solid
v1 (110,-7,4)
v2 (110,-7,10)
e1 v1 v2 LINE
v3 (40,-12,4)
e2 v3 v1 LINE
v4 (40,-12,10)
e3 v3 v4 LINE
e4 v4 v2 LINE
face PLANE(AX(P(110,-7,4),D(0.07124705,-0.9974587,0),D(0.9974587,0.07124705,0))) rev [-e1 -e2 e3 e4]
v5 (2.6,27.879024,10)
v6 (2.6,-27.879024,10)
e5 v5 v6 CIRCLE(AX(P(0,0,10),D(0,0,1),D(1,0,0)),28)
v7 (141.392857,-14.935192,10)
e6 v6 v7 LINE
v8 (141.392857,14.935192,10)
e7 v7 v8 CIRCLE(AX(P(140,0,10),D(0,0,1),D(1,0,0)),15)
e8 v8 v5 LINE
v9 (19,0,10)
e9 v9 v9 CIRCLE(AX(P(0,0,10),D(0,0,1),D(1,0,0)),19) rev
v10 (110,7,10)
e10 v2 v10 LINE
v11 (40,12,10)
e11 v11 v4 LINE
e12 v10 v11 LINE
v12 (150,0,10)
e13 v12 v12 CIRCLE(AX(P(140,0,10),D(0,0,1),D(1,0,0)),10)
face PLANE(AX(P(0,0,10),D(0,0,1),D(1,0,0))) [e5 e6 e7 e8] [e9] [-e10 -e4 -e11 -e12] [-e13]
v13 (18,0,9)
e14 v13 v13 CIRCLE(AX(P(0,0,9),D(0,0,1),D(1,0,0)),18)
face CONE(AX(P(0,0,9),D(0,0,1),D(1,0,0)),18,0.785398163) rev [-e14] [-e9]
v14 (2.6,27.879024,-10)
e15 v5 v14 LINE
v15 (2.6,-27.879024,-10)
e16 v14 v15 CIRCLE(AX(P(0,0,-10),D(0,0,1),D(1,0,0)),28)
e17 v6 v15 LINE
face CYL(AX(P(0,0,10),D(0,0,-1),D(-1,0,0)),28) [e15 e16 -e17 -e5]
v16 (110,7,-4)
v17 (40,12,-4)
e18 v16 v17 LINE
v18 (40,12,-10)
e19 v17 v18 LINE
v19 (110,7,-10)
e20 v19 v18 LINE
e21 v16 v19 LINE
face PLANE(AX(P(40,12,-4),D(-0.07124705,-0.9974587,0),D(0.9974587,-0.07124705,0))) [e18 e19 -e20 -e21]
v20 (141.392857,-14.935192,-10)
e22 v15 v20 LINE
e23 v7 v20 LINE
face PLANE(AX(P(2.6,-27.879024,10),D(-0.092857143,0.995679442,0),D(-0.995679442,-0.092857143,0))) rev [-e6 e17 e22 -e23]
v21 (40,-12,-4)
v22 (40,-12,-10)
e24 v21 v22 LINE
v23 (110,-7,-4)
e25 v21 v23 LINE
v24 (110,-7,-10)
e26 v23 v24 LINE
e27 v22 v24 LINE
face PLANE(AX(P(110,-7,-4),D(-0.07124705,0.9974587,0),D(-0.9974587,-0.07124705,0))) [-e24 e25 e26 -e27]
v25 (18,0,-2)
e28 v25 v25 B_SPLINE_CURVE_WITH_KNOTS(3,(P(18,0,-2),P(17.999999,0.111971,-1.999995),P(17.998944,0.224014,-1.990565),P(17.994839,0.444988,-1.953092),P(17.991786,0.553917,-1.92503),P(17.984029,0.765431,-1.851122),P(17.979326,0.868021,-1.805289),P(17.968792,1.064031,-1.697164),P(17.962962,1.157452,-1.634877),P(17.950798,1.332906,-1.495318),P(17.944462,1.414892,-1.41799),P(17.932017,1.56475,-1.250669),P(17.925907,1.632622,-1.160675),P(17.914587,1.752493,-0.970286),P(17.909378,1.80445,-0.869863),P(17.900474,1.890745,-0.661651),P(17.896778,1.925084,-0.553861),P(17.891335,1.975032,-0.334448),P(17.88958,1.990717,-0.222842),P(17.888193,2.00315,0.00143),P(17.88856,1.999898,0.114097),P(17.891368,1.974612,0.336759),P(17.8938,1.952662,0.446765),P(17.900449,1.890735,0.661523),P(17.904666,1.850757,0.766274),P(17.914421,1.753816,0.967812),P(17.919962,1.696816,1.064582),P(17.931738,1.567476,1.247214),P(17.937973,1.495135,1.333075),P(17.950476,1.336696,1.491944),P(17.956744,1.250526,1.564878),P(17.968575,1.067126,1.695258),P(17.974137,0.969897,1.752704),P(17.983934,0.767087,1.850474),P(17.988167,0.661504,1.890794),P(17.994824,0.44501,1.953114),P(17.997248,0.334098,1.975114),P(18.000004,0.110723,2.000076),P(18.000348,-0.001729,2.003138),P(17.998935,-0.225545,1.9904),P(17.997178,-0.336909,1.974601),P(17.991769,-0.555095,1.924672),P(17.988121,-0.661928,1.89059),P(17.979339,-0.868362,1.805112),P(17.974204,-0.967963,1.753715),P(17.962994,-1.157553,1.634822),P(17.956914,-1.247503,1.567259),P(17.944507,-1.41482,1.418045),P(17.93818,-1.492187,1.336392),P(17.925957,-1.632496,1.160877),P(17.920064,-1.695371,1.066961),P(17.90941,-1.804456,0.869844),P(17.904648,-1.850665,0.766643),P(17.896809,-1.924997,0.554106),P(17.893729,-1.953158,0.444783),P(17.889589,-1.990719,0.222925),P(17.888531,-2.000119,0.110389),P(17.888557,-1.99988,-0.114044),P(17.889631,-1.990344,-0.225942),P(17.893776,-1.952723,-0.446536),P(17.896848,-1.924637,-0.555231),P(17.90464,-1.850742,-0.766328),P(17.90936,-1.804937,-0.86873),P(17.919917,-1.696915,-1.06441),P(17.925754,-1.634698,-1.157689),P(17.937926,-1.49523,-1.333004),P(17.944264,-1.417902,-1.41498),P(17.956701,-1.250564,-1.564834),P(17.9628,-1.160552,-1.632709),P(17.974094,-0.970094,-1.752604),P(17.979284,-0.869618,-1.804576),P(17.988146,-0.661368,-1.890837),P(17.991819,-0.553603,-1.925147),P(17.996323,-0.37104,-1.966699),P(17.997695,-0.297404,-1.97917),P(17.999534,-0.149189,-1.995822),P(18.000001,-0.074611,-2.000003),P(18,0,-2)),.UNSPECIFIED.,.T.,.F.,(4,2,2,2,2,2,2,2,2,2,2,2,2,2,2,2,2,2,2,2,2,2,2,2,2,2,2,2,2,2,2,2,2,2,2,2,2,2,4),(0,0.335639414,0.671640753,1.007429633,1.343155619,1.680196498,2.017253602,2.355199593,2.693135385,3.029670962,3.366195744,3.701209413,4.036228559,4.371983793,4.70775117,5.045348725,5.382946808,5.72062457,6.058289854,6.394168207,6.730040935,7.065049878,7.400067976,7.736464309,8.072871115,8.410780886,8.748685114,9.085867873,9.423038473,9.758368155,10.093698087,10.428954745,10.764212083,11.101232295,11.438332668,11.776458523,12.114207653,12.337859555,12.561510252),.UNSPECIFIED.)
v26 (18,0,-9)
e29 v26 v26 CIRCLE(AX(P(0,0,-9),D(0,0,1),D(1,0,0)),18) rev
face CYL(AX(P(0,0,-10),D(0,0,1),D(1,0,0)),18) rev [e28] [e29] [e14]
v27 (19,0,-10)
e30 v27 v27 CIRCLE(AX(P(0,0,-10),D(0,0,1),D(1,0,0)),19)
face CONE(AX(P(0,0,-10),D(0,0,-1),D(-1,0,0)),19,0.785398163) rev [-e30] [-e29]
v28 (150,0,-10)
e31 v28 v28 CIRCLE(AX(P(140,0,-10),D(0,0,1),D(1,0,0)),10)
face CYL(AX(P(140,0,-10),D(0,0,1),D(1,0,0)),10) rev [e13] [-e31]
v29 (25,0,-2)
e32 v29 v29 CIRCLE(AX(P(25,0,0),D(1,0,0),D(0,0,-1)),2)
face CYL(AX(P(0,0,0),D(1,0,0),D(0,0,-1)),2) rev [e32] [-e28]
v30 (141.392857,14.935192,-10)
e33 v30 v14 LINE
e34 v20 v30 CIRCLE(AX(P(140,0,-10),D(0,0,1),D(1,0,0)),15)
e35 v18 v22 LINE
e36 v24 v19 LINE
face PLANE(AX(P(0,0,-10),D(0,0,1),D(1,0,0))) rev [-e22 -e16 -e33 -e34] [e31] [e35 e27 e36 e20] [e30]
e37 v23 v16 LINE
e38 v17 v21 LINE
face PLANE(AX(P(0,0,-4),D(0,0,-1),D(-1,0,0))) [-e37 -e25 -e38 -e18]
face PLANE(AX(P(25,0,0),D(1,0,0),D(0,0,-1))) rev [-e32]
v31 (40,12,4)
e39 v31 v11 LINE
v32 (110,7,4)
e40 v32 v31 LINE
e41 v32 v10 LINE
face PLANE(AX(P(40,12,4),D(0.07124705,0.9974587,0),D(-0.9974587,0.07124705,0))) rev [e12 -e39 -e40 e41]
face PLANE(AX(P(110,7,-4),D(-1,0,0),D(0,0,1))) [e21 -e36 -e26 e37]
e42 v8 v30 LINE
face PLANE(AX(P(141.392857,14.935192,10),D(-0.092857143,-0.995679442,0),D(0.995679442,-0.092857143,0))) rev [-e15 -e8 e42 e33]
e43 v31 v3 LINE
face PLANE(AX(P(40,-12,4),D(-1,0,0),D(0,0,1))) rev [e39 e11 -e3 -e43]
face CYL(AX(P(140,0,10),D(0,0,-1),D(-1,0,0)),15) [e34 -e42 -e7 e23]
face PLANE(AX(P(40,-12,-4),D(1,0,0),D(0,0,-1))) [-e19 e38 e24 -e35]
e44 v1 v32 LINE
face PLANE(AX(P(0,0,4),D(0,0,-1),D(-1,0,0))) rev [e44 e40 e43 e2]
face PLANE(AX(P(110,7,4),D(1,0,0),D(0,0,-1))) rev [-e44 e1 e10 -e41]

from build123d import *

# Parameters (mm, degrees)
EXTRUDE_START       = -10
EXTRUDE_1_DEPTH     = 20
SKETCH_2_R          = 18
CUT_EXTRUDE_1_DEPTH = 159.773423469
SKETCH_3_R          = 10
CUT_EXTRUDE_2_DEPTH = 159.773423469
CUT_EXTRUDE_3_DEPTH = 6
CUT_EXTRUDE_4_DEPTH = 6
CHAMFER_1_SIZE      = 1
SKETCH_7_R          = 2
CUT_EXTRUDE_6_DEPTH = 25


# Read off the part's stored shape, not the designer's step: 凸台-拉伸1
with BuildPart() as part:
    # 凸台-拉伸1 outline → 凸台-拉伸1 (new body)
    with BuildSketch(Plane.XY.offset(EXTRUDE_START)):
        with BuildLine():
            ThreePointArc((2.6, 27.879024373), (-28, 0), (2.6, -27.879024373))
            Line((2.6, -27.879024373), (141.392857143, -14.935191628))
            ThreePointArc((141.392857143, -14.935191628), (155, 0), (141.392857143, 14.935191628))
            Line((141.392857143, 14.935191628), (2.6, 27.879024373))
        make_face()
    extrude(amount=EXTRUDE_1_DEPTH)

    # 草图2 → 切除-拉伸1 (cut, through all)
    with BuildSketch(Plane.XY.offset(10)):
        Circle(SKETCH_2_R)
    extrude(amount=-CUT_EXTRUDE_1_DEPTH, mode=Mode.SUBTRACT)

    # 草图3 → 切除-拉伸2 (cut, through all)
    with BuildSketch(Plane.XY.offset(10)):
        with Locations((140, 0)):
            Circle(SKETCH_3_R)
    extrude(amount=-CUT_EXTRUDE_2_DEPTH, mode=Mode.SUBTRACT)

    # 草图4 → 切除-拉伸3 (cut)
    with BuildSketch(Plane.XY.offset(10)):
        Polygon((40, -12), (40, 12), (110, 7), (110, -7), align=None)
    extrude(amount=-CUT_EXTRUDE_3_DEPTH, mode=Mode.SUBTRACT)

    # 草图5 → 切除-拉伸4 (cut)
    with BuildSketch(Plane.XY.offset(-10)):
        Polygon((40, -12), (40, 12), (110, 7), (110, -7), align=None)
    extrude(amount=CUT_EXTRUDE_4_DEPTH, mode=Mode.SUBTRACT)

    # 倒角1
    chamfer_1_edges = [part.edges().sort_by_distance(p)[0] for p in [
        (-18, 0, -10),
        (-18, 0, 10),
    ]]
    chamfer(chamfer_1_edges, length=CHAMFER_1_SIZE)

    # 草图7 → 切除-拉伸6 (cut)
    with BuildSketch(Plane(origin=(25, 0, 0), x_dir=(0, 0, -1), z_dir=(1, 0, 0))):
        Circle(SKETCH_7_R)
    extrude(amount=-CUT_EXTRUDE_6_DEPTH, mode=Mode.SUBTRACT)


solid = part.part
